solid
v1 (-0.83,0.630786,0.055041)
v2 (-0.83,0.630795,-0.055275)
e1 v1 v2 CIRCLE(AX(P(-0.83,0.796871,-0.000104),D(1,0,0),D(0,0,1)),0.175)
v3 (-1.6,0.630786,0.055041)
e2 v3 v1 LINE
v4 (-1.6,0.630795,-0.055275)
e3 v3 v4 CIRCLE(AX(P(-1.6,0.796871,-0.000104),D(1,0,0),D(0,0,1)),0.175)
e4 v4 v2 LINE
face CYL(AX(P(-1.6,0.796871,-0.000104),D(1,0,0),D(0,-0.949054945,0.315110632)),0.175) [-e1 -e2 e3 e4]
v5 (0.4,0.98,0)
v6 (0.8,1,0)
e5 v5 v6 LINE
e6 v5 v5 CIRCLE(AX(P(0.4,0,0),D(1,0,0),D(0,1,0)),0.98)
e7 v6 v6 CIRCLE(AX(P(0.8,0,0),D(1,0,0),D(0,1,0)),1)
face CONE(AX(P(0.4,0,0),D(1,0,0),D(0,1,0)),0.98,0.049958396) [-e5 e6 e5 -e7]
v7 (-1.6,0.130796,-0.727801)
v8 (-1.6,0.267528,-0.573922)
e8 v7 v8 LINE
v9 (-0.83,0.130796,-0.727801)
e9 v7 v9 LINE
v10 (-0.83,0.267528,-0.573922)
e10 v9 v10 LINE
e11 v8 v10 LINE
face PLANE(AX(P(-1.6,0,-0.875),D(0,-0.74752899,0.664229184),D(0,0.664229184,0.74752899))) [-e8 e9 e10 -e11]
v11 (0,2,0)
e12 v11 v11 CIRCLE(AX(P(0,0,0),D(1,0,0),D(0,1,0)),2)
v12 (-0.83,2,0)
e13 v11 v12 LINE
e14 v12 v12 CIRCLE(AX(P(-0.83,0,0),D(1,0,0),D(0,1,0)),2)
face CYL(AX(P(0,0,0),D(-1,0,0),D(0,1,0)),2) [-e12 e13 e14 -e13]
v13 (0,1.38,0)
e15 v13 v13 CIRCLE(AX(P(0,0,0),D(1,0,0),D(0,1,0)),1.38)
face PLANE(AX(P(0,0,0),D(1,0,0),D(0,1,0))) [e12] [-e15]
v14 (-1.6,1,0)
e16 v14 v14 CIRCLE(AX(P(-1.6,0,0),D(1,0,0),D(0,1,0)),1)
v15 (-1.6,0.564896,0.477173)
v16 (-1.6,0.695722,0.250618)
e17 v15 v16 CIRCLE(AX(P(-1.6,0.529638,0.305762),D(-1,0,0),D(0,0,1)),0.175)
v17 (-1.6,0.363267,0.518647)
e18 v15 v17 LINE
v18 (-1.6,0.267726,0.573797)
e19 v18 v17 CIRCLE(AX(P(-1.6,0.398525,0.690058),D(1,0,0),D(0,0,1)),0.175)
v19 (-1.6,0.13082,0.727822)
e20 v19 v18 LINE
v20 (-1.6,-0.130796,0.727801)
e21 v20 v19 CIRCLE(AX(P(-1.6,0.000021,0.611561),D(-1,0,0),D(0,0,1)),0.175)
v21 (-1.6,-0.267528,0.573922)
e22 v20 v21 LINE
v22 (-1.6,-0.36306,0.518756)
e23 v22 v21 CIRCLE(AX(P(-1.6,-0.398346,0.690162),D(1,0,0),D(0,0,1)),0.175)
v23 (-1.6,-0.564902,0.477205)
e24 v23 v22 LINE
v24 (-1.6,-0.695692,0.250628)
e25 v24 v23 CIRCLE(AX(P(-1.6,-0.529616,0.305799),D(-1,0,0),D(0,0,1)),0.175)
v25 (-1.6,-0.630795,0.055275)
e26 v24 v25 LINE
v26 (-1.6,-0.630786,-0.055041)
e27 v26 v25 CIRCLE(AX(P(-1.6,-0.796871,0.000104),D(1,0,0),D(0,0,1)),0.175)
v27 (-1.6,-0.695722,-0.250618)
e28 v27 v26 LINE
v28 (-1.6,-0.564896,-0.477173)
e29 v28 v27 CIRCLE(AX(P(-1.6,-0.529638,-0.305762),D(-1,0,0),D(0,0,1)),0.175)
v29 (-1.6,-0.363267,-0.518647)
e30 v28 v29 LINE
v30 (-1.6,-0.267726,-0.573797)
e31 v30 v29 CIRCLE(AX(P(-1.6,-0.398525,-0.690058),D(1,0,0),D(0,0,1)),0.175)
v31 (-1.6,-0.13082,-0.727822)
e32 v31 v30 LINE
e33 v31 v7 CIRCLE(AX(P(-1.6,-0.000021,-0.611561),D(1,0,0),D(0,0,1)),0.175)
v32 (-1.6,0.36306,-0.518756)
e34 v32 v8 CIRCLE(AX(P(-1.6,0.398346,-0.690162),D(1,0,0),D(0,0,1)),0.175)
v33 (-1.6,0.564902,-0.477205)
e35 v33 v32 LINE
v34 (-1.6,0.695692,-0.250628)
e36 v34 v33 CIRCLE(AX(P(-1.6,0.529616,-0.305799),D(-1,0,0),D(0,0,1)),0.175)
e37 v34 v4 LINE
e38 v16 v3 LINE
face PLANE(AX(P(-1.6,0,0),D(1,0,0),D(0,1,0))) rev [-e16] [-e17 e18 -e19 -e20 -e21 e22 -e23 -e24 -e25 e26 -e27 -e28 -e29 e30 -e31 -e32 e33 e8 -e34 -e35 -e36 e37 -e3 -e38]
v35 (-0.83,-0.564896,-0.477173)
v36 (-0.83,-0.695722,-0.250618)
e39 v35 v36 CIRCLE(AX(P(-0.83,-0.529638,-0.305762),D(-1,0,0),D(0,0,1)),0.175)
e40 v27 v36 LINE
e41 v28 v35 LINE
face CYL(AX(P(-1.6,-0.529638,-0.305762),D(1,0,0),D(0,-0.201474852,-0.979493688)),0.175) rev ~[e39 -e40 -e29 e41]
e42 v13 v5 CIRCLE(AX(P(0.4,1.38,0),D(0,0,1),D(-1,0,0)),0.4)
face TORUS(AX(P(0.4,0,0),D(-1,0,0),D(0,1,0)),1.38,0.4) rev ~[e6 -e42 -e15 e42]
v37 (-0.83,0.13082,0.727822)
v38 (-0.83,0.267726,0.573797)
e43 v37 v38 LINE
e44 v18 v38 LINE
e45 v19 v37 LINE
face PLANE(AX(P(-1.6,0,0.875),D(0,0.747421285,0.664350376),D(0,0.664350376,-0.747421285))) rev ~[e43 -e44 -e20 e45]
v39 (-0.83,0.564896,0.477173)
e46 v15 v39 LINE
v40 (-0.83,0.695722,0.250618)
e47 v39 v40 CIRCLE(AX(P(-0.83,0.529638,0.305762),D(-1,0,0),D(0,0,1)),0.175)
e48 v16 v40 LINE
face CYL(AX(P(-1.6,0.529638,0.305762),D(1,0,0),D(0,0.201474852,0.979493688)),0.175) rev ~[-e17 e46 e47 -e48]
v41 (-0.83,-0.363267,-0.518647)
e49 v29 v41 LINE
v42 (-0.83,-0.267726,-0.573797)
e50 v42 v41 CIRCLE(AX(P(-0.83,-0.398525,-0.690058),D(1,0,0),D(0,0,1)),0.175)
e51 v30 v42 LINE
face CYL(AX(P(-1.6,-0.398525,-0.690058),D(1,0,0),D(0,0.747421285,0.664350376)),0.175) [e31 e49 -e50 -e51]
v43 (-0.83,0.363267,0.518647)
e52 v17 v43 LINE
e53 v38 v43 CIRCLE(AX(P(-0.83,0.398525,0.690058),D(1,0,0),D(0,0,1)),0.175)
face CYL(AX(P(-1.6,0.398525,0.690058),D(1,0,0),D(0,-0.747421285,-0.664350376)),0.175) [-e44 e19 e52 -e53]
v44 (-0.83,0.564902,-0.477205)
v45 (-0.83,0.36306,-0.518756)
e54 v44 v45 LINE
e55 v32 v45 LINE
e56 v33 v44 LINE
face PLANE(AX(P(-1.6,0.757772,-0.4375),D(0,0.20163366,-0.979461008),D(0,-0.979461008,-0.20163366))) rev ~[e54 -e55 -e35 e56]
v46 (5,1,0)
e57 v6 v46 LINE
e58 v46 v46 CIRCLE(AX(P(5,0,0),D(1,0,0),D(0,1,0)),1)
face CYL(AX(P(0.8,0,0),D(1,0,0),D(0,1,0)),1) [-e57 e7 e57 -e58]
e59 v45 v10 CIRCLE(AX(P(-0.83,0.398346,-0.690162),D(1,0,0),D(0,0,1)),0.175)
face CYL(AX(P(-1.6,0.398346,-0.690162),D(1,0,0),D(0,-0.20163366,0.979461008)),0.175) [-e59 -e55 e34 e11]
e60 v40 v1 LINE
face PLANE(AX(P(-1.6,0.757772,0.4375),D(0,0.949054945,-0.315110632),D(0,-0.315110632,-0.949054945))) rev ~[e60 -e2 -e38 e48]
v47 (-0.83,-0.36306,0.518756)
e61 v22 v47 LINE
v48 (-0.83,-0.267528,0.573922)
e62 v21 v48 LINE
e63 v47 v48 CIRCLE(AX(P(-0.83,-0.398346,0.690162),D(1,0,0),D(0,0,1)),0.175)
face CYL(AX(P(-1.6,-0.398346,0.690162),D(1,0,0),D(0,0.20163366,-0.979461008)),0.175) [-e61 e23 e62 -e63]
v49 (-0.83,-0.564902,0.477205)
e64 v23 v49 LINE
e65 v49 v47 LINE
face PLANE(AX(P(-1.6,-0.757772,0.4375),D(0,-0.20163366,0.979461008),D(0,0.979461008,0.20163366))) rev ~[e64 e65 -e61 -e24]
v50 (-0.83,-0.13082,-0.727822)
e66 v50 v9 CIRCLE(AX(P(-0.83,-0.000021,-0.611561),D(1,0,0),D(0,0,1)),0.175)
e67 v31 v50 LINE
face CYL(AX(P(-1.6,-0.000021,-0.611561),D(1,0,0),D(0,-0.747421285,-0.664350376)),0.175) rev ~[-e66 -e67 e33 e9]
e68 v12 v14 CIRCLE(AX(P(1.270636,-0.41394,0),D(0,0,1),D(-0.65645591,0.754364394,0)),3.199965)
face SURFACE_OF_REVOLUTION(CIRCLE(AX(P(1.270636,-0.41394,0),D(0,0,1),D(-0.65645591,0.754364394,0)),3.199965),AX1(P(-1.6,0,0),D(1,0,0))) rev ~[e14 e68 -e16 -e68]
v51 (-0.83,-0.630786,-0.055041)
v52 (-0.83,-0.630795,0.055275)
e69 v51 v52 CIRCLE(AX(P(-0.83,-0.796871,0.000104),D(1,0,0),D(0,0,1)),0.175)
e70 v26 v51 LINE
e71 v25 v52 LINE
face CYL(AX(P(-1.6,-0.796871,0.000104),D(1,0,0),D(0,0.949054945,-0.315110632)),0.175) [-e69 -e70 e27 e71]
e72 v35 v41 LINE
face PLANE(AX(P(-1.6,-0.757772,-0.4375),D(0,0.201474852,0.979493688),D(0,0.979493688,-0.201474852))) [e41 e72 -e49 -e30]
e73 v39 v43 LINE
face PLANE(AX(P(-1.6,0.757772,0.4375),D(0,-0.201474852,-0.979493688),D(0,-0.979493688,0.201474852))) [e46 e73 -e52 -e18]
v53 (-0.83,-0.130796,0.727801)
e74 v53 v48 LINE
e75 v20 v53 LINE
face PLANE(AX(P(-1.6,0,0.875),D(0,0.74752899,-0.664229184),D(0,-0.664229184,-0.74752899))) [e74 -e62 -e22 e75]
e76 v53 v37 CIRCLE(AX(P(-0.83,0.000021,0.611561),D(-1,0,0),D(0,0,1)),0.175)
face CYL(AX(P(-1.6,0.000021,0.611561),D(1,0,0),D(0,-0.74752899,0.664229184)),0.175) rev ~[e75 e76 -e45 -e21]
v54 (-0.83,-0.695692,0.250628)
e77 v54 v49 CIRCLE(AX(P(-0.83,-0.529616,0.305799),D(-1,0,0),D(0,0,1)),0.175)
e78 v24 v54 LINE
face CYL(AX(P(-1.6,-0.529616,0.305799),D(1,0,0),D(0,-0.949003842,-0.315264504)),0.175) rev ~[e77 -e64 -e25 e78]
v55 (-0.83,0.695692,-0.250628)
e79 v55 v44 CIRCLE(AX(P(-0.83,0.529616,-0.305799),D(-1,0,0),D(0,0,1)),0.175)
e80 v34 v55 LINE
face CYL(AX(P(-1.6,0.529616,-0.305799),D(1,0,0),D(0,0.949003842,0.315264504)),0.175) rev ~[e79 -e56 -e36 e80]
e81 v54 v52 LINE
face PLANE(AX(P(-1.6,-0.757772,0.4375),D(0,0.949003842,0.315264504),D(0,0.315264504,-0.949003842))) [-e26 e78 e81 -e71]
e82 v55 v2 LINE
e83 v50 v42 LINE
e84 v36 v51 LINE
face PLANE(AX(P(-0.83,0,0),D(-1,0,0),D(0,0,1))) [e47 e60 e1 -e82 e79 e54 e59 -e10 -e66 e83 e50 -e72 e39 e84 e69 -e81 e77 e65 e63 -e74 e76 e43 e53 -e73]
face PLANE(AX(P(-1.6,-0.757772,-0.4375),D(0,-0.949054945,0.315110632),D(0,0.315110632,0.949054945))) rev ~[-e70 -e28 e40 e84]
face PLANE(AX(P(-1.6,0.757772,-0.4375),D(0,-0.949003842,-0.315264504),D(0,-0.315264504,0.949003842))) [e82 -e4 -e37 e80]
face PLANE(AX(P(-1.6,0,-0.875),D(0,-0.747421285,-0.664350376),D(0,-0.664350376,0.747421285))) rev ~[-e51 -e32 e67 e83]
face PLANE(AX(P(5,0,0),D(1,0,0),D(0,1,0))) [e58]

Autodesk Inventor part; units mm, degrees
ref_plane "YZ Plane" through (0, 0, 0) normal (1, 0, 0) x (0, 1, 0)
ref_plane "XZ Plane" through (0, 0, 0) normal (0, 1, 0) x (-1, 0, 0)
ref_plane "XY Plane" through (0, 0, 0) normal (0, 0, 1) x (1, 0, 0)
sketch "Sketch4" plane through (0, 0, 0) normal (0, 0, 1) x (1, 0, 0)
  line L0 (-1.6, 0) -> (5, 0)
  line L1 (0, 0) -> (-1.6, 0)
  line L2 (0, 2) -> (0, 1.38)
  line L3 (0.4, 0.98) -> (0.4, 0.98)
  line L4 (0.4, 0.98) -> (0.8, 1)
  arc A0 (0, 1.38) -> (0.4, 0.98) centre (0.4, 1.38) ccw
  line L5 (-1.6, 0) -> (-1.6, 1)
  line L6 (0, 2) -> (-0.83, 2)
  arc A1 (-0.83, 2) -> (-1.6, 1) centre (1.2707, -0.414) ccw
  line L7 (0.8, 1) -> (5, 1)
  line L8 (5, 1) -> (5, 0)
  point P0 (0, 0.98)
  dimension "d71" = 0.4
  dimension "d72" = 5
  dimension "d74" = 0.4
  dimension "d75" = 1.96
  dimension "d78" = 2
  dimension "d82" = 3.2
  dimension "d83" = 1.6
  dimension "d84" = 4
  dimension "d104" = 4.2
  dimension "d105" = 2
revolve "Revolution7" add sketch "Sketch4" angle 360 about axis through (-1.6, 0, 0) along (1, 0, 0)
sketch "Sketch5" plane through (-1.6, 0, 0) normal (-1, 0, 0) x (0, 0, 1)
  circle A0 centre (0, 0) radius 0.875 construction
  circle A1 centre (0, 0) radius 0.6125 construction
  line L0 (0, 0) -> (-0.5304, 0.3062)
  line L1 (0, 0) -> (-0.5304, -0.3063)
  line L2 (-1.8008, 0) -> (1.7887, 0)
  line L3 (-0.875, 0) -> (-0.5304, -0.3063)
  line L4 (-0.875, 0) -> (-0.5304, 0.3062)
  point P0 (0, 0)
  dimension "d88" = 1.75
  dimension "d89" = 1.225
  dimension "d90" = 30
  dimension "d91" = 30
extrude "Extrusion1" cut sketch "Sketch5" against normal blind 0.77
pattern_circular "Circular Pattern1" count 6 over 360 about axis through (-10, 0, 0) along (1, 0, 0) of "Extrusion1"
fillet "Fillet1" radius 0.175 12 edges at (-1.215, -0.7578, -0.4375) (-1.215, -0.3063, -0.5304) (-1.215, -0.6125, 0) (-1.215, -0.7578, 0.4375) (-1.215, -0.3062, 0.5304) (-1.215, 0, 0.875) (-1.215, 0.6125, 0) (-1.215, 0.7578, 0.4375) (-1.215, 0.3063, 0.5304) (-1.215, 0.3062, -0.5304) (-1.215, 0, -0.875) (-1.215, 0.7578, -0.4375)
thread "Thread7" size "M2x0.4" class "6g" standard "ISO Metric profile" length 4.2
properties part number "Šroub s válcovou hlavou a šestiramennou drážkou ISO 14583 - M2 x 5 - 4.8" material "Ocel, měkká"
